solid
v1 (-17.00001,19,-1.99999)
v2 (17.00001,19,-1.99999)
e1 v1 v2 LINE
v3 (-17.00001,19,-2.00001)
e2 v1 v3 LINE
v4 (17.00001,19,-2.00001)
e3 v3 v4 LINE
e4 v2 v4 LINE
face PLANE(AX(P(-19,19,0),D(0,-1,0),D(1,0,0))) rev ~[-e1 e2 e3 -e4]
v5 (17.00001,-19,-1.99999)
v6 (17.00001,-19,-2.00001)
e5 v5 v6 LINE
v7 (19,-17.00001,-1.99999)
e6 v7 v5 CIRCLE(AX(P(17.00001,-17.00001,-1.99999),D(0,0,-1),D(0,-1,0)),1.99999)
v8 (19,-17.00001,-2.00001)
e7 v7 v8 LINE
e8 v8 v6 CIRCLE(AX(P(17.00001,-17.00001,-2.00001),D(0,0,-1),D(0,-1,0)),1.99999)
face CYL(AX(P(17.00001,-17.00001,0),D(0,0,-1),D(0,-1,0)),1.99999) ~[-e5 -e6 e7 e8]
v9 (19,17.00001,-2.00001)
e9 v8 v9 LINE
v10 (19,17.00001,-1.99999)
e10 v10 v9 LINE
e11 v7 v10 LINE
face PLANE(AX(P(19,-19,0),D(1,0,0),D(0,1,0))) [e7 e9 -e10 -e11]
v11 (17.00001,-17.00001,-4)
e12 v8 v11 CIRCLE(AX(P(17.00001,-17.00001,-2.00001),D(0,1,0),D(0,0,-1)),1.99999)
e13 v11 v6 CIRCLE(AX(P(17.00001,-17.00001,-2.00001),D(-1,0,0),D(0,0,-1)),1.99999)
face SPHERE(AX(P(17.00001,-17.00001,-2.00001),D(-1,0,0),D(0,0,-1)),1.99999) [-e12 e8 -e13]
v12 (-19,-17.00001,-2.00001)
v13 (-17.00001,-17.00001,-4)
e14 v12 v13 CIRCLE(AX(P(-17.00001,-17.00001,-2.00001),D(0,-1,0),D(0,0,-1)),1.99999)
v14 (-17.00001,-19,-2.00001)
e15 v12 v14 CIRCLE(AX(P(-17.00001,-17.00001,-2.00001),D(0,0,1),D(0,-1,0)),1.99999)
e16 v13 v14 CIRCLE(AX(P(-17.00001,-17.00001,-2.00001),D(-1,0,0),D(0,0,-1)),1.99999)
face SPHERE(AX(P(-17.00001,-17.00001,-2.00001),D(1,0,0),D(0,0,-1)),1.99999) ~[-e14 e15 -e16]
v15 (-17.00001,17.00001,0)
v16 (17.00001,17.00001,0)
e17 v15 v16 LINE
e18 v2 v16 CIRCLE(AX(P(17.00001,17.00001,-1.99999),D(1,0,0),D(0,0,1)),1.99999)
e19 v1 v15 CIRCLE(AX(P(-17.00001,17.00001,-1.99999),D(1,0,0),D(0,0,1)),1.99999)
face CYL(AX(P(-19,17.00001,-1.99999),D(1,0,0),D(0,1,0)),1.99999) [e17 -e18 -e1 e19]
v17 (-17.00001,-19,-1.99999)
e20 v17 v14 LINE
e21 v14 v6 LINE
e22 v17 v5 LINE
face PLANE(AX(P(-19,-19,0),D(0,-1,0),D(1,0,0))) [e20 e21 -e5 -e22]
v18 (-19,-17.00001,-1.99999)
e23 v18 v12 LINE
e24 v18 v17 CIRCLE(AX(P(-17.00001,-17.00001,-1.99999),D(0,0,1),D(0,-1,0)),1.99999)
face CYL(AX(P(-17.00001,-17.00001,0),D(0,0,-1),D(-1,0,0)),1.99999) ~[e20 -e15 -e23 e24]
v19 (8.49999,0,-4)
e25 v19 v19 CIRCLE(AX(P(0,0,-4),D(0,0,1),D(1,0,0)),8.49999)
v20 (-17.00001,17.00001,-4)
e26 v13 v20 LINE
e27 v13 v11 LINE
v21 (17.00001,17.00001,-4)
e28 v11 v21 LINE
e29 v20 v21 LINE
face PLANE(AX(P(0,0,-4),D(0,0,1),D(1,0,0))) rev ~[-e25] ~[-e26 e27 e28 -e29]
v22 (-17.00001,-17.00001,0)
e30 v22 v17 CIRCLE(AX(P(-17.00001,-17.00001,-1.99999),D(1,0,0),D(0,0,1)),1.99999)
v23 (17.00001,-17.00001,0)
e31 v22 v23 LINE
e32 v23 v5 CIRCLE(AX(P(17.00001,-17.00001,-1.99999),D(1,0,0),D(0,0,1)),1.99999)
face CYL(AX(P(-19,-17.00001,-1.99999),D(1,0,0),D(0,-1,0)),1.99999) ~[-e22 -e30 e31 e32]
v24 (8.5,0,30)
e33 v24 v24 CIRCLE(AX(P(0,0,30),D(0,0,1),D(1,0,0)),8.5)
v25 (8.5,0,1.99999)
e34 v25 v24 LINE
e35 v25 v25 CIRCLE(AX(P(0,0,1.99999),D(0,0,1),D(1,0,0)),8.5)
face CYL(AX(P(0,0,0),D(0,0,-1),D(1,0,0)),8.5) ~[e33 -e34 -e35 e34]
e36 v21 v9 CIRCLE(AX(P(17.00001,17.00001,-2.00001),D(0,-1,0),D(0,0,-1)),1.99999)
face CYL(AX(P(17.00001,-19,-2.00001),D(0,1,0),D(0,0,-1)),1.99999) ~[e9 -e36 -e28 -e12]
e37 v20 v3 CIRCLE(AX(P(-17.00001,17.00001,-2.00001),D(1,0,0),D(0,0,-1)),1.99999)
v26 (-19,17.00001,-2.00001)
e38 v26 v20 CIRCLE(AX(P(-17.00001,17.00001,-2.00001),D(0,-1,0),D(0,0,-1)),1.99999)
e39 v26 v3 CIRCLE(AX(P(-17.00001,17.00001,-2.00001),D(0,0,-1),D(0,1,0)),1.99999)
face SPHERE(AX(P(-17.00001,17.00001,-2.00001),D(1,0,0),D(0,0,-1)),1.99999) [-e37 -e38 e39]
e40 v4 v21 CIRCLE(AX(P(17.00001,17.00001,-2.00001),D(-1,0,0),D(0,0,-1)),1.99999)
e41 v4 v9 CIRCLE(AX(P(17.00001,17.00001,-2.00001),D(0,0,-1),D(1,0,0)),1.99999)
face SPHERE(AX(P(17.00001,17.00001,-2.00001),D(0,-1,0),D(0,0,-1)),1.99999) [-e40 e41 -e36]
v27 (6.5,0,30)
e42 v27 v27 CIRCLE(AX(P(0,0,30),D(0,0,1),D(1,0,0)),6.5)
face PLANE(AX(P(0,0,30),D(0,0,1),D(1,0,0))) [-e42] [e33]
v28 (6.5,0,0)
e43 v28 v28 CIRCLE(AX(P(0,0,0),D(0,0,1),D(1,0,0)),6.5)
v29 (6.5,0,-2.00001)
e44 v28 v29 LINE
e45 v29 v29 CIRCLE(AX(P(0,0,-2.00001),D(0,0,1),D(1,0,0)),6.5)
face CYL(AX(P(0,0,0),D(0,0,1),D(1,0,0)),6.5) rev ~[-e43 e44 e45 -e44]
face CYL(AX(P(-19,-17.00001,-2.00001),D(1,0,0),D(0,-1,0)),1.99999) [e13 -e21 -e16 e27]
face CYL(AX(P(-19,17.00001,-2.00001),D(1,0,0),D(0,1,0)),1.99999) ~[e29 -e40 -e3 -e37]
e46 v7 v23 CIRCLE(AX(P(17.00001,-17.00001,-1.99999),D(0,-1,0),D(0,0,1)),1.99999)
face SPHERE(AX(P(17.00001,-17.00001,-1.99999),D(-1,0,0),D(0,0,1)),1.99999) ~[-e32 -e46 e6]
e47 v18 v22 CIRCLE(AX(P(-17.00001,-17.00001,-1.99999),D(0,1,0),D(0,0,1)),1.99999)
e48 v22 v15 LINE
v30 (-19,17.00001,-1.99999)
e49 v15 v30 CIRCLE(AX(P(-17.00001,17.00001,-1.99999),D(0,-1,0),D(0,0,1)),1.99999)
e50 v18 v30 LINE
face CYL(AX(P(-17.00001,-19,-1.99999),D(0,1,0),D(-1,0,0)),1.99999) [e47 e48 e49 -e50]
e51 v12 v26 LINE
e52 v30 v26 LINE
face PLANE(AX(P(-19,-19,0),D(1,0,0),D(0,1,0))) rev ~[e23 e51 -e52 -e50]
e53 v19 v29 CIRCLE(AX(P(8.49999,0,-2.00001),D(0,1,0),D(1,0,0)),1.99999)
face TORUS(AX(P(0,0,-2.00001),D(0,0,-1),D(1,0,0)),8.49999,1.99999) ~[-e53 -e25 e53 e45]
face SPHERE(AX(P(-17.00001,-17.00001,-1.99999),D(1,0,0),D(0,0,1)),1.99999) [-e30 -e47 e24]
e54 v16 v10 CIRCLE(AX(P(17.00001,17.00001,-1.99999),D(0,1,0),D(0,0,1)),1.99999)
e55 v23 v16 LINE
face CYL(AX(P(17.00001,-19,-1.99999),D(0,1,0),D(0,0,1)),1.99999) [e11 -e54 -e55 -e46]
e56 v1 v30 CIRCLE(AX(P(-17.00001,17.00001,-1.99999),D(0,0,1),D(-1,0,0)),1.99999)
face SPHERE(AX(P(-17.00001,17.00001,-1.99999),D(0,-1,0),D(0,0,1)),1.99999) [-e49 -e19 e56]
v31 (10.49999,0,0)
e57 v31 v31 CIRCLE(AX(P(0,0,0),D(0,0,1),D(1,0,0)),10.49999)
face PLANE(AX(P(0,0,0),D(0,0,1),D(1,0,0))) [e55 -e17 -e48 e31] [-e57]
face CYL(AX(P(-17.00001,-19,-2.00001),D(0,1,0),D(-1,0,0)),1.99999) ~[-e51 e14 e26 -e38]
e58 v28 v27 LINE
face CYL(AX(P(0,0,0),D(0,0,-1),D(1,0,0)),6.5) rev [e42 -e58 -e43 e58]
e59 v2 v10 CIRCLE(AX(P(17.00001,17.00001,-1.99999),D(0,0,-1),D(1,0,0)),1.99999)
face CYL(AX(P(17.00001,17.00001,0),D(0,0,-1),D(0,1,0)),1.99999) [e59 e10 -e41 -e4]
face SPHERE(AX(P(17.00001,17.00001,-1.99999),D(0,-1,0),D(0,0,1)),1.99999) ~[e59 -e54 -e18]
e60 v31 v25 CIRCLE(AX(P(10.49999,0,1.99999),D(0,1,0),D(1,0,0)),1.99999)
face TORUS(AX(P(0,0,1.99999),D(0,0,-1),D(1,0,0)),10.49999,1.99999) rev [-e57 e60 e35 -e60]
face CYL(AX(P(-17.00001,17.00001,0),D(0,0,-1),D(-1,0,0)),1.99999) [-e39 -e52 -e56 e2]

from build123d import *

# Parameters (mm, degrees)
F0_R     = 8.5
F0_R_2   = 6.5
F1_DEPTH = 30
F2_W     = 38
F2_H     = 38
F2_R     = 6.5
F3_DEPTH = 4
F4_R     = 1.99999


# Not quite as in the source:
# - a fillet or chamfer is up to 0.001 mm smaller than in the source, because OpenCascade refuses the exact size


with BuildPart() as f1:
    # F0 (on Top) → F1 (new body)
    with BuildSketch(Plane.XY):
        Circle(F0_R)
        Circle(F0_R_2, mode=Mode.SUBTRACT)
    extrude(amount=F1_DEPTH)

    # F2 (on Top) → F3 (join)
    with BuildSketch(Plane.XY):
        Rectangle(F2_W, F2_H)
        Circle(F2_R, mode=Mode.SUBTRACT)
    extrude(amount=-F3_DEPTH)

    # F4 (radius 2 in the source; OpenCascade refuses exactly that, so slightly less here)
    f4_edges = [f1.edges().sort_by_distance(p)[0] for p in [
        (0, -19, -4),
        (19, 0, -4),
        (0, 19, -4),
        (-19, 0, -4),
        (-6.5, 0, -4),
        (0, -19, 0),
        (-19, 0, 0),
        (19, 0, 0),
        (0, 19, 0),
        (-8.5, 0, 0),
        (19, 19, -2),
        (-19, 19, -2),
        (19, -19, -2),
        (-19, -19, -2),
    ]]
    fillet(f4_edges, radius=F4_R)


solid = f1.part
